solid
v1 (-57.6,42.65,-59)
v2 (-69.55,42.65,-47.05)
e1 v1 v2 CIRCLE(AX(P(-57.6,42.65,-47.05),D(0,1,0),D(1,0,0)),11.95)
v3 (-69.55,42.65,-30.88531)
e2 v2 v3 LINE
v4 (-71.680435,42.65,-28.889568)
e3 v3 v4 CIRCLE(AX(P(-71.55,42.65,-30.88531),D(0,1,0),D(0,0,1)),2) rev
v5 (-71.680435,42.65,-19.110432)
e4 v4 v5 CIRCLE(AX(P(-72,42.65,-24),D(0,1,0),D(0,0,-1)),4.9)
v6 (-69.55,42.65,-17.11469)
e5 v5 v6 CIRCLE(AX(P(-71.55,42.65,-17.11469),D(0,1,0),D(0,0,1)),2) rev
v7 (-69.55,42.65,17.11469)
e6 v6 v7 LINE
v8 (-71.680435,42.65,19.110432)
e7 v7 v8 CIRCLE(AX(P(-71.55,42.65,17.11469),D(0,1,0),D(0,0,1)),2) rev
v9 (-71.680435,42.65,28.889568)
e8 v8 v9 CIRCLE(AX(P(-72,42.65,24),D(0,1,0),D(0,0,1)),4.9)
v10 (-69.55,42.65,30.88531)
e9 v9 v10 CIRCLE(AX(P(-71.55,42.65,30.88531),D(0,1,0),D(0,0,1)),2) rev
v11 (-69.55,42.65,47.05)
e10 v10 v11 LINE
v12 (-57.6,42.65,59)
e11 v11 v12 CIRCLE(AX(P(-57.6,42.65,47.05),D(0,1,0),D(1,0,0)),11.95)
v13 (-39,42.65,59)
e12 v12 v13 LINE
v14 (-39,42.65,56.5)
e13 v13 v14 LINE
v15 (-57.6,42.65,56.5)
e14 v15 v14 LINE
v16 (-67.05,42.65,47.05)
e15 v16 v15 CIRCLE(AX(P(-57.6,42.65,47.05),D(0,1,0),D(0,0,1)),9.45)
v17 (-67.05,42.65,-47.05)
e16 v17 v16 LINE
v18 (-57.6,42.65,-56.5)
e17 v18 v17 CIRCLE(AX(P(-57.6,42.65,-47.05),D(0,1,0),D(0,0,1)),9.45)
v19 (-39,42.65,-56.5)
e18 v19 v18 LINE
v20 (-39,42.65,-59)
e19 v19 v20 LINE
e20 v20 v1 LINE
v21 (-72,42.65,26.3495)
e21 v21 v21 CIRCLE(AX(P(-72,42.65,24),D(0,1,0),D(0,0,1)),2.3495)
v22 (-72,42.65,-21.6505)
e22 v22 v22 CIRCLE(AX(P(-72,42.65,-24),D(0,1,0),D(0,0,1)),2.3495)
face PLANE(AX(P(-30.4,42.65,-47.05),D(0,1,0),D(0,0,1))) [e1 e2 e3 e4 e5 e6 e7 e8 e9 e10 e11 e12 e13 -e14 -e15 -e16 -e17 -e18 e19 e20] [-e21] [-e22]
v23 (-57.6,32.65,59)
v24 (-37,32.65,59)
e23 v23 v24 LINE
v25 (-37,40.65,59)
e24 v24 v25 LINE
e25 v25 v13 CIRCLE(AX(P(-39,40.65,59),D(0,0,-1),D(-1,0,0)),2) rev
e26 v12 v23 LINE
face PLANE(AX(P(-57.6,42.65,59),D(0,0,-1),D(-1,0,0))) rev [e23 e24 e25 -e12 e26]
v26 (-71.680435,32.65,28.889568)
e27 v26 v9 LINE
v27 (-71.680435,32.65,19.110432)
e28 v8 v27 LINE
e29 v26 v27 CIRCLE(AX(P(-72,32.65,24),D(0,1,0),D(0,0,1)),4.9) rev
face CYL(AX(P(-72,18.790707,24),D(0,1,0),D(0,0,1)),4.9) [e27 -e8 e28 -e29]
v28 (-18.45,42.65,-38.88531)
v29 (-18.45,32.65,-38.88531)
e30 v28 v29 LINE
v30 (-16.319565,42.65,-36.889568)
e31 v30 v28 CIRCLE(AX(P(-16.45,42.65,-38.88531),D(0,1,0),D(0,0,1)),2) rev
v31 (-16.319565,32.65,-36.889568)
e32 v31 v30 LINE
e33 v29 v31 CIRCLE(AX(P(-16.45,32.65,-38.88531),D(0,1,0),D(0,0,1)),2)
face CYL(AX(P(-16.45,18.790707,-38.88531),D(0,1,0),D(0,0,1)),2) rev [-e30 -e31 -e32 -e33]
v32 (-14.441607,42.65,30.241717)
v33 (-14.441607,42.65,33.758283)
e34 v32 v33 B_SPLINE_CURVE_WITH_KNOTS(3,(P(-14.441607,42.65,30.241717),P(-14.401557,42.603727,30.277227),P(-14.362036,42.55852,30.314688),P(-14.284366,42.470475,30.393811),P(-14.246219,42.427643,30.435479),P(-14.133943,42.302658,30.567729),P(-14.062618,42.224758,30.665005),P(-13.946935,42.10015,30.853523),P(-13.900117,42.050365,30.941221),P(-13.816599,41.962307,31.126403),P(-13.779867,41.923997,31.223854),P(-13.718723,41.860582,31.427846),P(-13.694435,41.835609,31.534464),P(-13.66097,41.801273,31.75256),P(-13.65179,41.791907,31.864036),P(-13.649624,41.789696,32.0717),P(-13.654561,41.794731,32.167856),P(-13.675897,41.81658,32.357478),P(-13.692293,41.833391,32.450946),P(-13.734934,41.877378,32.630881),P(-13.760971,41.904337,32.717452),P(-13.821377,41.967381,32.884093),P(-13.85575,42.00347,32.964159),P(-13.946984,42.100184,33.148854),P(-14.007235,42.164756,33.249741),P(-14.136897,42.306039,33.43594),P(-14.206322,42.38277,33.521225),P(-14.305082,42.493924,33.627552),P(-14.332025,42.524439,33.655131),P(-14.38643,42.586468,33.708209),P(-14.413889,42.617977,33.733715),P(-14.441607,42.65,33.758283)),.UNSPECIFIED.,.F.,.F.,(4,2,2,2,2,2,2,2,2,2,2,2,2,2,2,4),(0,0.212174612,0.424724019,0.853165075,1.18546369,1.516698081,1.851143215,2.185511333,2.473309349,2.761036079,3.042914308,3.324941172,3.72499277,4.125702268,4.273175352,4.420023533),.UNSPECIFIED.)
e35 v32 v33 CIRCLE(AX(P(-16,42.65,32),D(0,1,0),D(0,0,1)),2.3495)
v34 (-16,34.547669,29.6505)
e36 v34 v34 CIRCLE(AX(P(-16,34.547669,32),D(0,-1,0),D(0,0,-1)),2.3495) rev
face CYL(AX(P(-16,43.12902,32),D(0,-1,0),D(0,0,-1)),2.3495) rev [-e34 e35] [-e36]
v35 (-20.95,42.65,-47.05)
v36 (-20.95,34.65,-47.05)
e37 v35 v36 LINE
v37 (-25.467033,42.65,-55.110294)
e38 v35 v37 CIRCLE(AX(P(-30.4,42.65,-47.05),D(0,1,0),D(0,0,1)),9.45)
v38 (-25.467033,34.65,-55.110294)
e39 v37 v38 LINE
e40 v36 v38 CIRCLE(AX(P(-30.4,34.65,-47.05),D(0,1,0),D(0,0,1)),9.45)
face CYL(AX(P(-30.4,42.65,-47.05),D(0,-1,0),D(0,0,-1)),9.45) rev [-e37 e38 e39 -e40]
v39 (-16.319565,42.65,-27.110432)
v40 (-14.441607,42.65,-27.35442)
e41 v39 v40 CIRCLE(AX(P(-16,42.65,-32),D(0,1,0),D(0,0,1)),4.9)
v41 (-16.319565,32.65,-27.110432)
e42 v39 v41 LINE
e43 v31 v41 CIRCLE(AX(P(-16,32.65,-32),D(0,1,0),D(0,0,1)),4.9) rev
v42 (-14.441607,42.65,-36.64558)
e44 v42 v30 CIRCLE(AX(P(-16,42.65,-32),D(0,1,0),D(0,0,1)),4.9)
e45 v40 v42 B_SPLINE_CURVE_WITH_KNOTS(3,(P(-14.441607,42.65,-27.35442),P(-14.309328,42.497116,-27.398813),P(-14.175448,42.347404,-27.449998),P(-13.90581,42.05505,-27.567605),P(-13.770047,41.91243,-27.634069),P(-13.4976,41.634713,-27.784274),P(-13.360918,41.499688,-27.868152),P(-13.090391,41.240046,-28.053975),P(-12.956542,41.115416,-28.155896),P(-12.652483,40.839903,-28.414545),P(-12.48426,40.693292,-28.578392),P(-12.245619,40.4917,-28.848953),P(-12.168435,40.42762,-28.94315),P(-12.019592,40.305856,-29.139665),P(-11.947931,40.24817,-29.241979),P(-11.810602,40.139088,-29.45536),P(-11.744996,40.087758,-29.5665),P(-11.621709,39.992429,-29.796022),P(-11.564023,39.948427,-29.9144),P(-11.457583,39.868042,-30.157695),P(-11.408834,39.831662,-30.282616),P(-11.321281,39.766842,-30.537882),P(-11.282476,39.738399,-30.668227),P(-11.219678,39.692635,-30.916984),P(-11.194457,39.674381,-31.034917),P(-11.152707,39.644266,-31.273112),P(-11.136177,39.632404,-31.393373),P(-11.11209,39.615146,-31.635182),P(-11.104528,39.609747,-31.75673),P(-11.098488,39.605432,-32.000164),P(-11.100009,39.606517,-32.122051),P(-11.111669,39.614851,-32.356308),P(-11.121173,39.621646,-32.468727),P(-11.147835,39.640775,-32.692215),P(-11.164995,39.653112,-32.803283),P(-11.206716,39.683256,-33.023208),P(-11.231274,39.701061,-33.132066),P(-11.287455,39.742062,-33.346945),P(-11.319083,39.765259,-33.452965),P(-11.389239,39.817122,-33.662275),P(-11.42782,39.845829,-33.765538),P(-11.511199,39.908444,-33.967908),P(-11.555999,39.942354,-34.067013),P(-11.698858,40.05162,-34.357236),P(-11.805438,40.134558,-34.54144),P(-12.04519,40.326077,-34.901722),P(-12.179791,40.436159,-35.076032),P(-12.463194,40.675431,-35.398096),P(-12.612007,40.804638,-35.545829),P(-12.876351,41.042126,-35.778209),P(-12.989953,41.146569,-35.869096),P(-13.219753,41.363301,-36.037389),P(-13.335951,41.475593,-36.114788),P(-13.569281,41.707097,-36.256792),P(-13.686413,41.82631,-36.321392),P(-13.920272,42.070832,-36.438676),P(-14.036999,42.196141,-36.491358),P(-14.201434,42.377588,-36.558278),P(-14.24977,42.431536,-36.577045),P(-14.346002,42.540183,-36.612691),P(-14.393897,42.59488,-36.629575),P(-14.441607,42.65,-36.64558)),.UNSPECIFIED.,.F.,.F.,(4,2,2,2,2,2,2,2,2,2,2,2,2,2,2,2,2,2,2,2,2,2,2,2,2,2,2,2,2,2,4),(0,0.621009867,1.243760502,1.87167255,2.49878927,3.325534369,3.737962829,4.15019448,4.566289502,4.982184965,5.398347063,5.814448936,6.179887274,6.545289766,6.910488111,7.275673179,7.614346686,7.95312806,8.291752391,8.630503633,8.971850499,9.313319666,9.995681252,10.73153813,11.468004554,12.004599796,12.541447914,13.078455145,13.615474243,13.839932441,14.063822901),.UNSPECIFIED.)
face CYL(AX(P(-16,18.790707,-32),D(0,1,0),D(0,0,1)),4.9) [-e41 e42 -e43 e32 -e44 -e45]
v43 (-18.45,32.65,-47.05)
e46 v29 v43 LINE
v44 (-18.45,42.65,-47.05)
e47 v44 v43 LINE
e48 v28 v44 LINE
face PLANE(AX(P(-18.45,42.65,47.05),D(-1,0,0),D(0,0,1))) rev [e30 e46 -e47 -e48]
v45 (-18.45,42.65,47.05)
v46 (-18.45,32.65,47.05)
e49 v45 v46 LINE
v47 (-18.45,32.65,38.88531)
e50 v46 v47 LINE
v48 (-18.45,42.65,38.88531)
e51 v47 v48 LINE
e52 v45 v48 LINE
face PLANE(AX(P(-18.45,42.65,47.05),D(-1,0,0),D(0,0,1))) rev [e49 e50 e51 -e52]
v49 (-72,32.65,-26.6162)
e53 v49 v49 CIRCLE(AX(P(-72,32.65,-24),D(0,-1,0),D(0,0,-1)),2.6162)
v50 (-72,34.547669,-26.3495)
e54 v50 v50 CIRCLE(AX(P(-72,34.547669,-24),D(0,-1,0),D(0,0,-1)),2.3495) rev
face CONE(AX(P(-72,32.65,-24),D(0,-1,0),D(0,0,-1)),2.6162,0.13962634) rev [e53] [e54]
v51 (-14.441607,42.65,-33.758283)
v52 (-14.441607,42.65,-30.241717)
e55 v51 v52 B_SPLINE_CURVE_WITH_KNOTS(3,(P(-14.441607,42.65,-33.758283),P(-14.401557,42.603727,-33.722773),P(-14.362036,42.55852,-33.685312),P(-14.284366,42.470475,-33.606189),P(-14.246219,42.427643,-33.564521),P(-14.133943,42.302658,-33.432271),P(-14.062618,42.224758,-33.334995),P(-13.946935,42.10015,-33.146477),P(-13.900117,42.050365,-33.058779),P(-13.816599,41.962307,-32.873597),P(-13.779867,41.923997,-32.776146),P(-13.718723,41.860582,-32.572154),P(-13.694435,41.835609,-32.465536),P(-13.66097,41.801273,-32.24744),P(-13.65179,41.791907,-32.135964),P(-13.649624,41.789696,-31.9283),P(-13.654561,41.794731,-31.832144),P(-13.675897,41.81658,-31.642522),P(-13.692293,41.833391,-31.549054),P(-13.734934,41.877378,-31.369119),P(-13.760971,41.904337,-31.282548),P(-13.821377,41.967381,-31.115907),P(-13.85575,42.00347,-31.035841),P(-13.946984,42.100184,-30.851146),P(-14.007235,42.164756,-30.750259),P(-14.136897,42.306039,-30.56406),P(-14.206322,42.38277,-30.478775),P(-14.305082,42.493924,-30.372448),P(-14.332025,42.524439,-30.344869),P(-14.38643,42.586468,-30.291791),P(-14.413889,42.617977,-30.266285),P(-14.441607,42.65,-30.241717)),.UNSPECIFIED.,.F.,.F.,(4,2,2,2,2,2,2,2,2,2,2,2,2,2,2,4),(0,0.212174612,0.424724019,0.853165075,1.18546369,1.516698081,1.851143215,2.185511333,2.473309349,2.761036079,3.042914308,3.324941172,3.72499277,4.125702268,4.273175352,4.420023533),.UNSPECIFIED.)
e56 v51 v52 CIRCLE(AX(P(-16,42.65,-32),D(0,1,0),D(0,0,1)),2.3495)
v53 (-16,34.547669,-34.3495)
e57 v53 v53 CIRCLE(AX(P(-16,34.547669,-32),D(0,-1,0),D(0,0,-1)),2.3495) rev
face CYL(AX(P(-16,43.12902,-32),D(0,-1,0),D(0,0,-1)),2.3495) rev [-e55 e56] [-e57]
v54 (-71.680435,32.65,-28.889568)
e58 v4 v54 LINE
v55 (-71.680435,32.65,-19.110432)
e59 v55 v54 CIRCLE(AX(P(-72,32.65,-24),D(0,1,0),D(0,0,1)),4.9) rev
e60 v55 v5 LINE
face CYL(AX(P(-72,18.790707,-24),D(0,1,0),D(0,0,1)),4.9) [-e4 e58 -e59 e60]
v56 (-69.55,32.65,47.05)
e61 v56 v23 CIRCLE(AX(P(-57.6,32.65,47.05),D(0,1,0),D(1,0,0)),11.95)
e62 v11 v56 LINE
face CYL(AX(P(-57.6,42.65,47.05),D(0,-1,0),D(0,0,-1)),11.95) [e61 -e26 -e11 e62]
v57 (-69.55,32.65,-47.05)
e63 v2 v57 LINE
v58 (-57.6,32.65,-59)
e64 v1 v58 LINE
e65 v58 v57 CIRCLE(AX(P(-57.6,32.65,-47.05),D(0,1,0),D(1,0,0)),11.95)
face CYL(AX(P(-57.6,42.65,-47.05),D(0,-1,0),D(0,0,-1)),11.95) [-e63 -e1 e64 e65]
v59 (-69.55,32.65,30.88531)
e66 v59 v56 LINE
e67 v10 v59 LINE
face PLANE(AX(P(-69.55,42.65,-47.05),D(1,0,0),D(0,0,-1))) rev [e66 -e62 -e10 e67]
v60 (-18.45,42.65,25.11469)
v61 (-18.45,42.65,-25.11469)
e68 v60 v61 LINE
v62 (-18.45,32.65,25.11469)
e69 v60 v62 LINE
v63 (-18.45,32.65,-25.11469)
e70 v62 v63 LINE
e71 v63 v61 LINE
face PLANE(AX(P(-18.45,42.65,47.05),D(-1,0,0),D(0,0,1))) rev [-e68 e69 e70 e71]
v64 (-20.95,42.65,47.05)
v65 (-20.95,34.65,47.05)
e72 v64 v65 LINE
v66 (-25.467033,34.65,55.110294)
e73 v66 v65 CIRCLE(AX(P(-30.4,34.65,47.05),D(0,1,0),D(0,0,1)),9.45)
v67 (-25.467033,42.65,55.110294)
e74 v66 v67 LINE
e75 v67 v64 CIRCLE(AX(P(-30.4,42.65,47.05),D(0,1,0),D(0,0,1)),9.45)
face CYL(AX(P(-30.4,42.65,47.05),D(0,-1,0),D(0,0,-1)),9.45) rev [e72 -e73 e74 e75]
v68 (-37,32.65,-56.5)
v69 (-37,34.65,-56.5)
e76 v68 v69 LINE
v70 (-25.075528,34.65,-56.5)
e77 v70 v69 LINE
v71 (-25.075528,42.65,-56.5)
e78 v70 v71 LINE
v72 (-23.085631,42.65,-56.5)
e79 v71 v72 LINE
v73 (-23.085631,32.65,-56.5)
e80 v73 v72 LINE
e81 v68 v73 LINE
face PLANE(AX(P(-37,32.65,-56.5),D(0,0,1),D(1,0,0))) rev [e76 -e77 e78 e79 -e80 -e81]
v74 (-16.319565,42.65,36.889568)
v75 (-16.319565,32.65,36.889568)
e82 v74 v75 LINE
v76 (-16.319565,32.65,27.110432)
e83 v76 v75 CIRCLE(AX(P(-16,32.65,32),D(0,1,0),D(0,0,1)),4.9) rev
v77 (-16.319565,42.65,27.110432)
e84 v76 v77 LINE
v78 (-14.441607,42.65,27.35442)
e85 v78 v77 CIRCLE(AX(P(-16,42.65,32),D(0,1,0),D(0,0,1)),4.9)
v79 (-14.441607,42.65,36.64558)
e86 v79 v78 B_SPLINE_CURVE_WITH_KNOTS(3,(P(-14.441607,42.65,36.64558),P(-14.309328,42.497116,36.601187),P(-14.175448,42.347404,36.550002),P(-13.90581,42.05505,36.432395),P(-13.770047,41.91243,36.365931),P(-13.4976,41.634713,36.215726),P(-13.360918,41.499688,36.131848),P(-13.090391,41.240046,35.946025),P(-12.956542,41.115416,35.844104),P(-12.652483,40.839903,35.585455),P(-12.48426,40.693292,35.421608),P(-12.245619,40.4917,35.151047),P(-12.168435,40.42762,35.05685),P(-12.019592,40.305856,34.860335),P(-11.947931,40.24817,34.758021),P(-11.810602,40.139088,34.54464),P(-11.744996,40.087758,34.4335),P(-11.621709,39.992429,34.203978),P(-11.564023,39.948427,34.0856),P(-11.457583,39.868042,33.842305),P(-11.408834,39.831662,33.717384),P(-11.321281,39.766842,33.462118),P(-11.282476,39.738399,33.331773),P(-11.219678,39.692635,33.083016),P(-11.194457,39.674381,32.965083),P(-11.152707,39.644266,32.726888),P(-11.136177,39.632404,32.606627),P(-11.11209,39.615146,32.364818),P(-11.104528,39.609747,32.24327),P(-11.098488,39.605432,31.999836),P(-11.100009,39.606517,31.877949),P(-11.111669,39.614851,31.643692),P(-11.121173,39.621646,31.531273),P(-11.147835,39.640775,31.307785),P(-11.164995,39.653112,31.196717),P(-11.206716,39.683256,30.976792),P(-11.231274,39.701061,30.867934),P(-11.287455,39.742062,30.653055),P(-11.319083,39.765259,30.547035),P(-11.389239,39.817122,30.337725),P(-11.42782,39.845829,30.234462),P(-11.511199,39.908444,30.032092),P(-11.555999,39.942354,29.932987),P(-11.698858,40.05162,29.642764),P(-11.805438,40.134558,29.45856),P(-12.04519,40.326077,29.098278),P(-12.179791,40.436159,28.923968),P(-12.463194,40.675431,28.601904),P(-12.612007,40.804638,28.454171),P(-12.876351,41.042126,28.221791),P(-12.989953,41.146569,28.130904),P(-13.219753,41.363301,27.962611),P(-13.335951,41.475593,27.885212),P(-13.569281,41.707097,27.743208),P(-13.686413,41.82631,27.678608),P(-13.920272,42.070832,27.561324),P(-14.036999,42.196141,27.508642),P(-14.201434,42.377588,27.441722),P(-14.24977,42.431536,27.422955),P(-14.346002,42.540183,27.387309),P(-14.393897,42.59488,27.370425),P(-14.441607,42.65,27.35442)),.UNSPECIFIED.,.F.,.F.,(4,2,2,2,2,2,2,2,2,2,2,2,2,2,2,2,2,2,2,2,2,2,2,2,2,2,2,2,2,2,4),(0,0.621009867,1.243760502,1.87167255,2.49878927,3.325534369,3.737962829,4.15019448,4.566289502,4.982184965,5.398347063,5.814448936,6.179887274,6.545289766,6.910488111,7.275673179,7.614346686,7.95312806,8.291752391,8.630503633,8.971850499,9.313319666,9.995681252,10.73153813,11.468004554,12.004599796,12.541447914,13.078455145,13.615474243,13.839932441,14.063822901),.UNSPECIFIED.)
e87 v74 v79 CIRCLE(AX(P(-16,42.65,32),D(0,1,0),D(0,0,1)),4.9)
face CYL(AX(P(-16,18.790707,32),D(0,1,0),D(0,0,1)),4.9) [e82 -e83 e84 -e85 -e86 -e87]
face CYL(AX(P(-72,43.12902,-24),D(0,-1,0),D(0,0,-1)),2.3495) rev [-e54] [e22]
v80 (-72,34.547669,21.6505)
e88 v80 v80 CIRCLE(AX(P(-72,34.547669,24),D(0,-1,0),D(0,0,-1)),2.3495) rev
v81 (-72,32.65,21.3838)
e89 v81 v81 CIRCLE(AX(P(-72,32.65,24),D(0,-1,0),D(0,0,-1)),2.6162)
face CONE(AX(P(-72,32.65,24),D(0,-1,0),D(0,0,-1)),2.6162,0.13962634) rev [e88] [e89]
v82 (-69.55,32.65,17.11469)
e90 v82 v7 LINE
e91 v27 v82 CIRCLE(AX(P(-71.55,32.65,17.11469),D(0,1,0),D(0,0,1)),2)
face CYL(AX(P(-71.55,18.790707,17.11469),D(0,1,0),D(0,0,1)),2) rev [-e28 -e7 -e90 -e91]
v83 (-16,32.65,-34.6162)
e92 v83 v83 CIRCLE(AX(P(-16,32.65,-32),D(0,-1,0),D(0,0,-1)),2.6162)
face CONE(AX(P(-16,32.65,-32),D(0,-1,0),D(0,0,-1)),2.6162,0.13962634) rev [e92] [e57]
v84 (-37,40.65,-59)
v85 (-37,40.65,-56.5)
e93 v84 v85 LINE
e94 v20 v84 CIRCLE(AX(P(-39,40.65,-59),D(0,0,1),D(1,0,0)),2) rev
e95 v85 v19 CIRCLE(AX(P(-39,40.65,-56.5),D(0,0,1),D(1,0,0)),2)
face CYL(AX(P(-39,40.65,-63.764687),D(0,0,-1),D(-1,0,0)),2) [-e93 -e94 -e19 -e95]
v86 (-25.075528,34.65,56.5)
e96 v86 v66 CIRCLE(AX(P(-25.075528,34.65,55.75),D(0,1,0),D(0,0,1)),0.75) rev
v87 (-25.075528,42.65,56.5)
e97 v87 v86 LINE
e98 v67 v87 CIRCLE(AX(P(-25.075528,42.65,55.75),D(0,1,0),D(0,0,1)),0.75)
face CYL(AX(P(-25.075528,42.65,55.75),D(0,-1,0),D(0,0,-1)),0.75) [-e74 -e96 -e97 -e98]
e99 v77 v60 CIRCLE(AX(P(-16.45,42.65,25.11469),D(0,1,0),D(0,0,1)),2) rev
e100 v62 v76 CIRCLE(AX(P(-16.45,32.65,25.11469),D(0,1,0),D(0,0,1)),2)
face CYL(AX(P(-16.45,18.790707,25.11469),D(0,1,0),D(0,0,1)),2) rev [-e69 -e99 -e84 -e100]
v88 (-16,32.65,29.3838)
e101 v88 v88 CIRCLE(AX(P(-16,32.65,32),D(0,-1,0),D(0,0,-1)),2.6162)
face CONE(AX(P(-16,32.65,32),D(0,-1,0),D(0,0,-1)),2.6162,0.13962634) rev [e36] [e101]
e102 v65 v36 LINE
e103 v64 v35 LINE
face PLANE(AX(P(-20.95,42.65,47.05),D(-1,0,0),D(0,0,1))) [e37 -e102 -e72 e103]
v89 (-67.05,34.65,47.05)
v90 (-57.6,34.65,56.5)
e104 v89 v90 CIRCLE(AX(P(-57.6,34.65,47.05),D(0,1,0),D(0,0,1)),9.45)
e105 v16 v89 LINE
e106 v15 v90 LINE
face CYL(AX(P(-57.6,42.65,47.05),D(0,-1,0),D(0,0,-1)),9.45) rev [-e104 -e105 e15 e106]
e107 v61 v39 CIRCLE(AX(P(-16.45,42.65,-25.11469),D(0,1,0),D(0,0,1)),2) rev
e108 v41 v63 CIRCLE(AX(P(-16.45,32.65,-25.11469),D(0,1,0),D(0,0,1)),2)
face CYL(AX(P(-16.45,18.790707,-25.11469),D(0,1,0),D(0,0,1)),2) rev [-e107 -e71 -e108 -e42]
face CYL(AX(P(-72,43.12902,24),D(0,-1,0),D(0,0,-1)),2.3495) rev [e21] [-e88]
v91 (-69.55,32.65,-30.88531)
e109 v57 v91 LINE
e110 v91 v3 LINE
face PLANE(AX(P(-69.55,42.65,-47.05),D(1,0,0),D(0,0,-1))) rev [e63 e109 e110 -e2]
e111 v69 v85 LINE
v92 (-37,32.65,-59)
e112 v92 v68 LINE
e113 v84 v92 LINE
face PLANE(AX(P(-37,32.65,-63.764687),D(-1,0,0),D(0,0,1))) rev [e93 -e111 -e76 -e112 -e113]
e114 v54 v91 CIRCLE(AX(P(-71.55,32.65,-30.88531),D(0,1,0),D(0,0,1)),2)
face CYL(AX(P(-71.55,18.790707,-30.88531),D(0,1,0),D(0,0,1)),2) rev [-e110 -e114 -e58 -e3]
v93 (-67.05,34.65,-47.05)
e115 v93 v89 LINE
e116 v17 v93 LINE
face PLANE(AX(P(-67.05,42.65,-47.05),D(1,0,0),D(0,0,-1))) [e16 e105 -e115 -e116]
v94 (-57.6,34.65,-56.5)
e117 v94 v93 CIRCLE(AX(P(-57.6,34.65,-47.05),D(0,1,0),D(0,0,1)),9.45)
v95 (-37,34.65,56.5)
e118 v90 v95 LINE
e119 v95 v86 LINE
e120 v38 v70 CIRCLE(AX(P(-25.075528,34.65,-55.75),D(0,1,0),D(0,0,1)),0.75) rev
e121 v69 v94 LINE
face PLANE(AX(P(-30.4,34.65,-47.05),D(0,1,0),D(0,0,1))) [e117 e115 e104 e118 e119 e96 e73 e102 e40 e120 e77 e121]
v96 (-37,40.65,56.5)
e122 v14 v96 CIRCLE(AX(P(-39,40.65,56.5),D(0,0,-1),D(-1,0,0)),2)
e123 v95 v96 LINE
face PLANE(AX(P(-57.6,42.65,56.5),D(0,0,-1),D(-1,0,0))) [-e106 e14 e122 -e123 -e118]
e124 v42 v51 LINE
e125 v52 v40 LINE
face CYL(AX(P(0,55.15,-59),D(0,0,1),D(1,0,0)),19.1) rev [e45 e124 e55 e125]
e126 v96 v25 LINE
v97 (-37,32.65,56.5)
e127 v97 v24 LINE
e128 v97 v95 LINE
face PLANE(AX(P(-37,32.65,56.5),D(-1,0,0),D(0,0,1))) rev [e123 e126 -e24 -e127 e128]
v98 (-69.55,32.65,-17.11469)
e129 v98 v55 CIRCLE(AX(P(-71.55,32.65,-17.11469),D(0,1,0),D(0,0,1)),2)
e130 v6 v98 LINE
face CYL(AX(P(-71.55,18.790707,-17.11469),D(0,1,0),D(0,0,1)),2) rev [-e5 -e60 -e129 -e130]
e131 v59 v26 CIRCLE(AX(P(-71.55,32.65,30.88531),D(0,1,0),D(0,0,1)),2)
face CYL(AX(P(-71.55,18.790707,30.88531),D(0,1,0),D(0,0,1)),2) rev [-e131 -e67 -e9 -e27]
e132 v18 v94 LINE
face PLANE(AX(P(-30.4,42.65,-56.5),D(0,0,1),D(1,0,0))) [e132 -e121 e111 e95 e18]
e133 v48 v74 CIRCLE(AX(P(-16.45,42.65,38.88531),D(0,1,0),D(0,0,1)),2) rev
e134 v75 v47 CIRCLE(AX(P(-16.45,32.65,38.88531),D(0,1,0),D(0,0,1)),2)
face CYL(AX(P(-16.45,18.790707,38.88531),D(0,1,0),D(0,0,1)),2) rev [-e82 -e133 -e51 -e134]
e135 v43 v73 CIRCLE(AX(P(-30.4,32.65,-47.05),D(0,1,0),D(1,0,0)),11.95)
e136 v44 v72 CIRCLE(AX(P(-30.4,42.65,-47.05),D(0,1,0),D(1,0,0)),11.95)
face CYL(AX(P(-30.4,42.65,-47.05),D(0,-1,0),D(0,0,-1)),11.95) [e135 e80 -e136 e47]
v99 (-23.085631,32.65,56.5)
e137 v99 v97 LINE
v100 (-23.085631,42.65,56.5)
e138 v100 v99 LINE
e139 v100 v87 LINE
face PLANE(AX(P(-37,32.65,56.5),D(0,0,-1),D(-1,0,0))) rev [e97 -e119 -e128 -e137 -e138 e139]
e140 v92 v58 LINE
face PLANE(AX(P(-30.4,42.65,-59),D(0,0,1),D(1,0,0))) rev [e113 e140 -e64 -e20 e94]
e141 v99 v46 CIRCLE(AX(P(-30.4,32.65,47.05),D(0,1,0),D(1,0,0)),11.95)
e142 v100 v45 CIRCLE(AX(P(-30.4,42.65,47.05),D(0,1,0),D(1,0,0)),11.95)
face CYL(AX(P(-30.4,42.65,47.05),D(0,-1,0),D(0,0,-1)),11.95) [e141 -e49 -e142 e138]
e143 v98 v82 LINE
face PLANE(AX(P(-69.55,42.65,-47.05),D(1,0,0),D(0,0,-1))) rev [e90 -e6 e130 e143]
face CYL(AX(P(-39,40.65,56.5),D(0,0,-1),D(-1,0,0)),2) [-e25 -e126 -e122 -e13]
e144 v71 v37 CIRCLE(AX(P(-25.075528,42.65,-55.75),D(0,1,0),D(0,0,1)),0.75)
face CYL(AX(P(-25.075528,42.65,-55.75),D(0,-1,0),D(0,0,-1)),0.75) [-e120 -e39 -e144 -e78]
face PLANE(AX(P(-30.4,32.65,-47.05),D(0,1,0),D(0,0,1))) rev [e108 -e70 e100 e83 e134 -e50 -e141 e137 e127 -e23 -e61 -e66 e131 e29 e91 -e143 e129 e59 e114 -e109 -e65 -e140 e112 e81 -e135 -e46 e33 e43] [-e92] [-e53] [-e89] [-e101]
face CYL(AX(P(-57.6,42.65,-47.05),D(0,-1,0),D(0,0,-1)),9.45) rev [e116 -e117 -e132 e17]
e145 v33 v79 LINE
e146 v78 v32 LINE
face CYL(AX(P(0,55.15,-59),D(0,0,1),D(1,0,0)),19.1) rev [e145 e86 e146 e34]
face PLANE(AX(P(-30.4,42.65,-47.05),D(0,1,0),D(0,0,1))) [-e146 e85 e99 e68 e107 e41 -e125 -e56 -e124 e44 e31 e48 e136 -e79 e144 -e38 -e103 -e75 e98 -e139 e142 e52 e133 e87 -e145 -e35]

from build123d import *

# Parameters (mm, degrees)
EXTRUDE_THIN1_DEPTH          = 10
BOSS_EXTRUDE1_DEPTH          = 2
SKETCH2_W                    = 25.834060226
SKETCH2_H                    = 7.264687176
SKETCH2_W_2                  = 26.707196626
SKETCH2_H_2                  = 6.244092899
CUT_EXTRUDE1_DEPTH           = 92.75076294
SKETCH3_R                    = 4.9
BOSS_EXTRUDE2_DEPTH          = 10
FILLET1_START                = 34.65
FILLET1_DEPTH                = 9.35
FILLET2_R                    = 2
CUT_EXTRUDE2_DEPTH           = 106.894440364
CUT_EXTRUDE2_DEPTH_BACK      = 106.894440364
SKETCH5_R                    = 19.1
SKETCH6_R                    = 2.6162
CUT_EXTRUDE3_DEPTH           = 5
CUT_EXTRUDE3_DRAFT           = -8
CUT_EXTRUDE3_PROFILE_2_DEPTH = 5
CUT_EXTRUDE3_PROFILE_2_DRAFT = -8
CUT_EXTRUDE3_PROFILE_3_DEPTH = 5
CUT_EXTRUDE3_PROFILE_3_DRAFT = -8
CUT_EXTRUDE3_PROFILE_4_DEPTH = 5
CUT_EXTRUDE3_PROFILE_4_DRAFT = -8
SKETCH7_R                    = 2.3495
CUT_EXTRUDE4_DEPTH           = 98.440289419


with BuildPart() as part:
    # Sketch1 → Extrude-Thin1 (new body)
    with BuildSketch(Plane(origin=(0, 32.65, 0), x_dir=(1, 0, 0), z_dir=(0, 1, 0))):
        with BuildLine():
            Line((-69.55, 47.05), (-69.55, -47.05))
            ThreePointArc((-69.55, -47.05), (-66.049926035, -55.499926035), (-57.6, -59))
            Line((-57.6, -59), (-30.4, -59))
            ThreePointArc((-30.4, -59), (-21.950073965, -55.499926035), (-18.45, -47.05))
            Line((-18.45, -47.05), (-18.45, 47.05))
            ThreePointArc((-18.45, 47.05), (-21.950073965, 55.499926035), (-30.4, 59))
            Line((-30.4, 59), (-57.6, 59))
            ThreePointArc((-57.6, 59), (-66.049926035, 55.499926035), (-69.55, 47.05))
        make_face()
        with BuildLine():
            Line((-67.05, 47.05), (-67.05, -47.05))
            ThreePointArc((-67.05, -47.05), (-64.282159082, -53.732159082), (-57.6, -56.5))
            Line((-57.6, -56.5), (-30.4, -56.5))
            ThreePointArc((-30.4, -56.5), (-23.717840918, -53.732159082), (-20.95, -47.05))
            Line((-20.95, -47.05), (-20.95, 47.05))
            ThreePointArc((-20.95, 47.05), (-23.717840918, 53.732159082), (-30.4, 56.5))
            Line((-30.4, 56.5), (-57.6, 56.5))
            ThreePointArc((-57.6, 56.5), (-64.282159082, 53.732159082), (-67.05, 47.05))
        make_face(mode=Mode.SUBTRACT)
    extrude(amount=EXTRUDE_THIN1_DEPTH)

    # Sketch1<2> → Boss-Extrude1 (add)
    with BuildSketch(Plane(origin=(0, 32.65, 0), x_dir=(1, 0, 0), z_dir=(0, 1, 0))):
        with BuildLine():
            Line((-20.95, -47.05), (-20.95, 47.05))
            ThreePointArc((-20.95, 47.05), (-23.717840918, 53.732159082), (-30.4, 56.5))
            Line((-30.4, 56.5), (-57.6, 56.5))
            ThreePointArc((-57.6, 56.5), (-64.282159082, 53.732159082), (-67.05, 47.05))
            Line((-67.05, 47.05), (-67.05, -47.05))
            ThreePointArc((-67.05, -47.05), (-64.282159082, -53.732159082), (-57.6, -56.5))
            Line((-57.6, -56.5), (-30.4, -56.5))
            ThreePointArc((-30.4, -56.5), (-23.717840918, -53.732159082), (-20.95, -47.05))
        make_face()
    extrude(amount=BOSS_EXTRUDE1_DEPTH)

    # Sketch2 → Cut-Extrude1 (cut, through all)
    with BuildSketch(Plane(origin=(0, 42.65, 0), x_dir=(1, 0, 0), z_dir=(0, 1, 0))):
        with Locations((-24.082969887, 60.132343588)):
            Rectangle(SKETCH2_W, SKETCH2_H)
        with Locations((-23.646401687, -59.62204645)):
            Rectangle(SKETCH2_W_2, SKETCH2_H_2)
    extrude(amount=-CUT_EXTRUDE1_DEPTH, mode=Mode.SUBTRACT)

    # Sketch3 → Boss-Extrude2 (add)
    with BuildSketch(Plane(origin=(0, 42.65, 0), x_dir=(1, 0, 0), z_dir=(0, 1, 0))):
        with Locations((-72, -24)):
            Circle(SKETCH3_R)
        with Locations((-16, -32)):
            Circle(SKETCH3_R)
        with Locations((-16, 32)):
            Circle(SKETCH3_R)
        with Locations((-72, 24)):
            Circle(SKETCH3_R)
    extrude(amount=-BOSS_EXTRUDE2_DEPTH)

    # Fillet1: read off the stored shape, not the designer's step
    # Fillet1 outline → Fillet1 (cut)
    with BuildSketch(Plane(origin=(0, 0, 0), x_dir=(1, 0, 0), z_dir=(0, 1, 0)).offset(FILLET1_START)):
        with BuildLine():
            ThreePointArc((-30.4, 56.5), (-27.837508967, 56.145940837), (-25.467033475, 55.110294118))
            ThreePointArc((-25.467033475, 55.110294118), (-25.797428262, 55.953372305), (-25.075528195, 56.5))
            Line((-25.075528195, 56.5), (-30.4, 56.5))
        make_face()
        with BuildLine():
            Line((-30.4, -56.5), (-25.075528195, -56.5))
            ThreePointArc((-25.075528195, -56.5), (-25.797428262, -55.953372305), (-25.467033475, -55.110294118))
            ThreePointArc((-25.467033475, -55.110294118), (-27.837508967, -56.145940837), (-30.4, -56.5))
        make_face()
    extrude(amount=FILLET1_DEPTH, mode=Mode.SUBTRACT)

    # Fillet2
    fillet2_edges = [part.edges().sort_by_distance(p)[0] for p in [
        (-69.55, 37.65, 28.243524479),
        (-69.55, 37.65, 19.756475521),
        (-18.45, 37.65, 27.756475521),
        (-18.45, 37.65, 36.243524479),
        (-18.45, 37.65, -36.243524479),
        (-18.45, 37.65, -27.756475521),
        (-69.55, 37.65, -28.243524479),
        (-69.55, 37.65, -19.756475521),
        (-37, 42.65, -57.75),
        (-37, 42.65, 57.75),
    ]]
    fillet(fillet2_edges, radius=FILLET2_R)

    # Sketch5 → Cut-Extrude2 (cut, two sides: drawn at the far end of the back side and taken through both)
    with BuildSketch(Plane.XY.offset(-CUT_EXTRUDE2_DEPTH_BACK)):
        with Locations((0, 55.15)):
            Circle(SKETCH5_R)
    extrude(amount=CUT_EXTRUDE2_DEPTH + CUT_EXTRUDE2_DEPTH_BACK, mode=Mode.SUBTRACT)


with BuildPart() as cut_extrude3_tool:
    # Sketch6 → Cut-Extrude3 (with draft: the straight prism first)
    with BuildSketch(Plane.XZ.offset(-32.65)):
        with Locations((-72, 24)):
            Circle(SKETCH6_R)
    extrude(amount=-CUT_EXTRUDE3_DEPTH)
    # Cut-Extrude3: the draft: its side faces are tilted about the plane it starts from
    cut_extrude3_sides = [cut_extrude3_tool.faces().sort_by_distance(p)[0] for p in [
        (-74.6162, 35.15, 24),
    ]]
    draft(cut_extrude3_sides, Plane.XZ.offset(-32.65), CUT_EXTRUDE3_DRAFT)


with BuildPart() as part_1:
    add(part.part)

    # Cut-Extrude3: cut by cut_extrude3_tool
    add(cut_extrude3_tool.part, mode=Mode.SUBTRACT)


with BuildPart() as cut_extrude3_profile_2_tool:
    # Sketch6 → Cut-Extrude3 profile 2 (with draft: the straight prism first)
    with BuildSketch(Plane.XZ.offset(-32.65)):
        with Locations((-16, 32)):
            Circle(SKETCH6_R)
    extrude(amount=-CUT_EXTRUDE3_PROFILE_2_DEPTH)
    # Cut-Extrude3 profile 2: the draft: its side faces are tilted about the plane it starts from
    cut_extrude3_profile_2_sides = [cut_extrude3_profile_2_tool.faces().sort_by_distance(p)[0] for p in [
        (-18.6162, 35.15, 32),
    ]]
    draft(cut_extrude3_profile_2_sides, Plane.XZ.offset(-32.65), CUT_EXTRUDE3_PROFILE_2_DRAFT)


with BuildPart() as part_2:
    add(part_1.part)

    # Cut-Extrude3 profile 2: cut by cut_extrude3_profile_2_tool
    add(cut_extrude3_profile_2_tool.part, mode=Mode.SUBTRACT)


with BuildPart() as cut_extrude3_profile_3_tool:
    # Sketch6 → Cut-Extrude3 profile 3 (with draft: the straight prism first)
    with BuildSketch(Plane.XZ.offset(-32.65)):
        with Locations((-16, -32)):
            Circle(SKETCH6_R)
    extrude(amount=-CUT_EXTRUDE3_PROFILE_3_DEPTH)
    # Cut-Extrude3 profile 3: the draft: its side faces are tilted about the plane it starts from
    cut_extrude3_profile_3_sides = [cut_extrude3_profile_3_tool.faces().sort_by_distance(p)[0] for p in [
        (-18.6162, 35.15, -32),
    ]]
    draft(cut_extrude3_profile_3_sides, Plane.XZ.offset(-32.65), CUT_EXTRUDE3_PROFILE_3_DRAFT)


with BuildPart() as part_3:
    add(part_2.part)

    # Cut-Extrude3 profile 3: cut by cut_extrude3_profile_3_tool
    add(cut_extrude3_profile_3_tool.part, mode=Mode.SUBTRACT)


with BuildPart() as cut_extrude3_profile_4_tool:
    # Sketch6 → Cut-Extrude3 profile 4 (with draft: the straight prism first)
    with BuildSketch(Plane.XZ.offset(-32.65)):
        with Locations((-72, -24)):
            Circle(SKETCH6_R)
    extrude(amount=-CUT_EXTRUDE3_PROFILE_4_DEPTH)
    # Cut-Extrude3 profile 4: the draft: its side faces are tilted about the plane it starts from
    cut_extrude3_profile_4_sides = [cut_extrude3_profile_4_tool.faces().sort_by_distance(p)[0] for p in [
        (-74.6162, 35.15, -24),
    ]]
    draft(cut_extrude3_profile_4_sides, Plane.XZ.offset(-32.65), CUT_EXTRUDE3_PROFILE_4_DRAFT)


with BuildPart() as part_4:
    add(part_3.part)

    # Cut-Extrude3 profile 4: cut by cut_extrude3_profile_4_tool
    add(cut_extrude3_profile_4_tool.part, mode=Mode.SUBTRACT)

    # Sketch7 → Cut-Extrude4 (cut, through all)
    with BuildSketch(Plane.XZ.offset(-32.65)):
        with Locations(Location((-72, 24, 0), (0, 0, 270))):
            Circle(SKETCH7_R)
        with Locations(Location((-16, 32, 0), (0, 0, 270))):
            Circle(SKETCH7_R)
        with Locations(Location((-16, -32, 0), (0, 0, 270))):
            Circle(SKETCH7_R)
        with Locations(Location((-72, -24, 0), (0, 0, 270))):
            Circle(SKETCH7_R)
    extrude(amount=-CUT_EXTRUDE4_DEPTH, mode=Mode.SUBTRACT)


solid = part_4.part
